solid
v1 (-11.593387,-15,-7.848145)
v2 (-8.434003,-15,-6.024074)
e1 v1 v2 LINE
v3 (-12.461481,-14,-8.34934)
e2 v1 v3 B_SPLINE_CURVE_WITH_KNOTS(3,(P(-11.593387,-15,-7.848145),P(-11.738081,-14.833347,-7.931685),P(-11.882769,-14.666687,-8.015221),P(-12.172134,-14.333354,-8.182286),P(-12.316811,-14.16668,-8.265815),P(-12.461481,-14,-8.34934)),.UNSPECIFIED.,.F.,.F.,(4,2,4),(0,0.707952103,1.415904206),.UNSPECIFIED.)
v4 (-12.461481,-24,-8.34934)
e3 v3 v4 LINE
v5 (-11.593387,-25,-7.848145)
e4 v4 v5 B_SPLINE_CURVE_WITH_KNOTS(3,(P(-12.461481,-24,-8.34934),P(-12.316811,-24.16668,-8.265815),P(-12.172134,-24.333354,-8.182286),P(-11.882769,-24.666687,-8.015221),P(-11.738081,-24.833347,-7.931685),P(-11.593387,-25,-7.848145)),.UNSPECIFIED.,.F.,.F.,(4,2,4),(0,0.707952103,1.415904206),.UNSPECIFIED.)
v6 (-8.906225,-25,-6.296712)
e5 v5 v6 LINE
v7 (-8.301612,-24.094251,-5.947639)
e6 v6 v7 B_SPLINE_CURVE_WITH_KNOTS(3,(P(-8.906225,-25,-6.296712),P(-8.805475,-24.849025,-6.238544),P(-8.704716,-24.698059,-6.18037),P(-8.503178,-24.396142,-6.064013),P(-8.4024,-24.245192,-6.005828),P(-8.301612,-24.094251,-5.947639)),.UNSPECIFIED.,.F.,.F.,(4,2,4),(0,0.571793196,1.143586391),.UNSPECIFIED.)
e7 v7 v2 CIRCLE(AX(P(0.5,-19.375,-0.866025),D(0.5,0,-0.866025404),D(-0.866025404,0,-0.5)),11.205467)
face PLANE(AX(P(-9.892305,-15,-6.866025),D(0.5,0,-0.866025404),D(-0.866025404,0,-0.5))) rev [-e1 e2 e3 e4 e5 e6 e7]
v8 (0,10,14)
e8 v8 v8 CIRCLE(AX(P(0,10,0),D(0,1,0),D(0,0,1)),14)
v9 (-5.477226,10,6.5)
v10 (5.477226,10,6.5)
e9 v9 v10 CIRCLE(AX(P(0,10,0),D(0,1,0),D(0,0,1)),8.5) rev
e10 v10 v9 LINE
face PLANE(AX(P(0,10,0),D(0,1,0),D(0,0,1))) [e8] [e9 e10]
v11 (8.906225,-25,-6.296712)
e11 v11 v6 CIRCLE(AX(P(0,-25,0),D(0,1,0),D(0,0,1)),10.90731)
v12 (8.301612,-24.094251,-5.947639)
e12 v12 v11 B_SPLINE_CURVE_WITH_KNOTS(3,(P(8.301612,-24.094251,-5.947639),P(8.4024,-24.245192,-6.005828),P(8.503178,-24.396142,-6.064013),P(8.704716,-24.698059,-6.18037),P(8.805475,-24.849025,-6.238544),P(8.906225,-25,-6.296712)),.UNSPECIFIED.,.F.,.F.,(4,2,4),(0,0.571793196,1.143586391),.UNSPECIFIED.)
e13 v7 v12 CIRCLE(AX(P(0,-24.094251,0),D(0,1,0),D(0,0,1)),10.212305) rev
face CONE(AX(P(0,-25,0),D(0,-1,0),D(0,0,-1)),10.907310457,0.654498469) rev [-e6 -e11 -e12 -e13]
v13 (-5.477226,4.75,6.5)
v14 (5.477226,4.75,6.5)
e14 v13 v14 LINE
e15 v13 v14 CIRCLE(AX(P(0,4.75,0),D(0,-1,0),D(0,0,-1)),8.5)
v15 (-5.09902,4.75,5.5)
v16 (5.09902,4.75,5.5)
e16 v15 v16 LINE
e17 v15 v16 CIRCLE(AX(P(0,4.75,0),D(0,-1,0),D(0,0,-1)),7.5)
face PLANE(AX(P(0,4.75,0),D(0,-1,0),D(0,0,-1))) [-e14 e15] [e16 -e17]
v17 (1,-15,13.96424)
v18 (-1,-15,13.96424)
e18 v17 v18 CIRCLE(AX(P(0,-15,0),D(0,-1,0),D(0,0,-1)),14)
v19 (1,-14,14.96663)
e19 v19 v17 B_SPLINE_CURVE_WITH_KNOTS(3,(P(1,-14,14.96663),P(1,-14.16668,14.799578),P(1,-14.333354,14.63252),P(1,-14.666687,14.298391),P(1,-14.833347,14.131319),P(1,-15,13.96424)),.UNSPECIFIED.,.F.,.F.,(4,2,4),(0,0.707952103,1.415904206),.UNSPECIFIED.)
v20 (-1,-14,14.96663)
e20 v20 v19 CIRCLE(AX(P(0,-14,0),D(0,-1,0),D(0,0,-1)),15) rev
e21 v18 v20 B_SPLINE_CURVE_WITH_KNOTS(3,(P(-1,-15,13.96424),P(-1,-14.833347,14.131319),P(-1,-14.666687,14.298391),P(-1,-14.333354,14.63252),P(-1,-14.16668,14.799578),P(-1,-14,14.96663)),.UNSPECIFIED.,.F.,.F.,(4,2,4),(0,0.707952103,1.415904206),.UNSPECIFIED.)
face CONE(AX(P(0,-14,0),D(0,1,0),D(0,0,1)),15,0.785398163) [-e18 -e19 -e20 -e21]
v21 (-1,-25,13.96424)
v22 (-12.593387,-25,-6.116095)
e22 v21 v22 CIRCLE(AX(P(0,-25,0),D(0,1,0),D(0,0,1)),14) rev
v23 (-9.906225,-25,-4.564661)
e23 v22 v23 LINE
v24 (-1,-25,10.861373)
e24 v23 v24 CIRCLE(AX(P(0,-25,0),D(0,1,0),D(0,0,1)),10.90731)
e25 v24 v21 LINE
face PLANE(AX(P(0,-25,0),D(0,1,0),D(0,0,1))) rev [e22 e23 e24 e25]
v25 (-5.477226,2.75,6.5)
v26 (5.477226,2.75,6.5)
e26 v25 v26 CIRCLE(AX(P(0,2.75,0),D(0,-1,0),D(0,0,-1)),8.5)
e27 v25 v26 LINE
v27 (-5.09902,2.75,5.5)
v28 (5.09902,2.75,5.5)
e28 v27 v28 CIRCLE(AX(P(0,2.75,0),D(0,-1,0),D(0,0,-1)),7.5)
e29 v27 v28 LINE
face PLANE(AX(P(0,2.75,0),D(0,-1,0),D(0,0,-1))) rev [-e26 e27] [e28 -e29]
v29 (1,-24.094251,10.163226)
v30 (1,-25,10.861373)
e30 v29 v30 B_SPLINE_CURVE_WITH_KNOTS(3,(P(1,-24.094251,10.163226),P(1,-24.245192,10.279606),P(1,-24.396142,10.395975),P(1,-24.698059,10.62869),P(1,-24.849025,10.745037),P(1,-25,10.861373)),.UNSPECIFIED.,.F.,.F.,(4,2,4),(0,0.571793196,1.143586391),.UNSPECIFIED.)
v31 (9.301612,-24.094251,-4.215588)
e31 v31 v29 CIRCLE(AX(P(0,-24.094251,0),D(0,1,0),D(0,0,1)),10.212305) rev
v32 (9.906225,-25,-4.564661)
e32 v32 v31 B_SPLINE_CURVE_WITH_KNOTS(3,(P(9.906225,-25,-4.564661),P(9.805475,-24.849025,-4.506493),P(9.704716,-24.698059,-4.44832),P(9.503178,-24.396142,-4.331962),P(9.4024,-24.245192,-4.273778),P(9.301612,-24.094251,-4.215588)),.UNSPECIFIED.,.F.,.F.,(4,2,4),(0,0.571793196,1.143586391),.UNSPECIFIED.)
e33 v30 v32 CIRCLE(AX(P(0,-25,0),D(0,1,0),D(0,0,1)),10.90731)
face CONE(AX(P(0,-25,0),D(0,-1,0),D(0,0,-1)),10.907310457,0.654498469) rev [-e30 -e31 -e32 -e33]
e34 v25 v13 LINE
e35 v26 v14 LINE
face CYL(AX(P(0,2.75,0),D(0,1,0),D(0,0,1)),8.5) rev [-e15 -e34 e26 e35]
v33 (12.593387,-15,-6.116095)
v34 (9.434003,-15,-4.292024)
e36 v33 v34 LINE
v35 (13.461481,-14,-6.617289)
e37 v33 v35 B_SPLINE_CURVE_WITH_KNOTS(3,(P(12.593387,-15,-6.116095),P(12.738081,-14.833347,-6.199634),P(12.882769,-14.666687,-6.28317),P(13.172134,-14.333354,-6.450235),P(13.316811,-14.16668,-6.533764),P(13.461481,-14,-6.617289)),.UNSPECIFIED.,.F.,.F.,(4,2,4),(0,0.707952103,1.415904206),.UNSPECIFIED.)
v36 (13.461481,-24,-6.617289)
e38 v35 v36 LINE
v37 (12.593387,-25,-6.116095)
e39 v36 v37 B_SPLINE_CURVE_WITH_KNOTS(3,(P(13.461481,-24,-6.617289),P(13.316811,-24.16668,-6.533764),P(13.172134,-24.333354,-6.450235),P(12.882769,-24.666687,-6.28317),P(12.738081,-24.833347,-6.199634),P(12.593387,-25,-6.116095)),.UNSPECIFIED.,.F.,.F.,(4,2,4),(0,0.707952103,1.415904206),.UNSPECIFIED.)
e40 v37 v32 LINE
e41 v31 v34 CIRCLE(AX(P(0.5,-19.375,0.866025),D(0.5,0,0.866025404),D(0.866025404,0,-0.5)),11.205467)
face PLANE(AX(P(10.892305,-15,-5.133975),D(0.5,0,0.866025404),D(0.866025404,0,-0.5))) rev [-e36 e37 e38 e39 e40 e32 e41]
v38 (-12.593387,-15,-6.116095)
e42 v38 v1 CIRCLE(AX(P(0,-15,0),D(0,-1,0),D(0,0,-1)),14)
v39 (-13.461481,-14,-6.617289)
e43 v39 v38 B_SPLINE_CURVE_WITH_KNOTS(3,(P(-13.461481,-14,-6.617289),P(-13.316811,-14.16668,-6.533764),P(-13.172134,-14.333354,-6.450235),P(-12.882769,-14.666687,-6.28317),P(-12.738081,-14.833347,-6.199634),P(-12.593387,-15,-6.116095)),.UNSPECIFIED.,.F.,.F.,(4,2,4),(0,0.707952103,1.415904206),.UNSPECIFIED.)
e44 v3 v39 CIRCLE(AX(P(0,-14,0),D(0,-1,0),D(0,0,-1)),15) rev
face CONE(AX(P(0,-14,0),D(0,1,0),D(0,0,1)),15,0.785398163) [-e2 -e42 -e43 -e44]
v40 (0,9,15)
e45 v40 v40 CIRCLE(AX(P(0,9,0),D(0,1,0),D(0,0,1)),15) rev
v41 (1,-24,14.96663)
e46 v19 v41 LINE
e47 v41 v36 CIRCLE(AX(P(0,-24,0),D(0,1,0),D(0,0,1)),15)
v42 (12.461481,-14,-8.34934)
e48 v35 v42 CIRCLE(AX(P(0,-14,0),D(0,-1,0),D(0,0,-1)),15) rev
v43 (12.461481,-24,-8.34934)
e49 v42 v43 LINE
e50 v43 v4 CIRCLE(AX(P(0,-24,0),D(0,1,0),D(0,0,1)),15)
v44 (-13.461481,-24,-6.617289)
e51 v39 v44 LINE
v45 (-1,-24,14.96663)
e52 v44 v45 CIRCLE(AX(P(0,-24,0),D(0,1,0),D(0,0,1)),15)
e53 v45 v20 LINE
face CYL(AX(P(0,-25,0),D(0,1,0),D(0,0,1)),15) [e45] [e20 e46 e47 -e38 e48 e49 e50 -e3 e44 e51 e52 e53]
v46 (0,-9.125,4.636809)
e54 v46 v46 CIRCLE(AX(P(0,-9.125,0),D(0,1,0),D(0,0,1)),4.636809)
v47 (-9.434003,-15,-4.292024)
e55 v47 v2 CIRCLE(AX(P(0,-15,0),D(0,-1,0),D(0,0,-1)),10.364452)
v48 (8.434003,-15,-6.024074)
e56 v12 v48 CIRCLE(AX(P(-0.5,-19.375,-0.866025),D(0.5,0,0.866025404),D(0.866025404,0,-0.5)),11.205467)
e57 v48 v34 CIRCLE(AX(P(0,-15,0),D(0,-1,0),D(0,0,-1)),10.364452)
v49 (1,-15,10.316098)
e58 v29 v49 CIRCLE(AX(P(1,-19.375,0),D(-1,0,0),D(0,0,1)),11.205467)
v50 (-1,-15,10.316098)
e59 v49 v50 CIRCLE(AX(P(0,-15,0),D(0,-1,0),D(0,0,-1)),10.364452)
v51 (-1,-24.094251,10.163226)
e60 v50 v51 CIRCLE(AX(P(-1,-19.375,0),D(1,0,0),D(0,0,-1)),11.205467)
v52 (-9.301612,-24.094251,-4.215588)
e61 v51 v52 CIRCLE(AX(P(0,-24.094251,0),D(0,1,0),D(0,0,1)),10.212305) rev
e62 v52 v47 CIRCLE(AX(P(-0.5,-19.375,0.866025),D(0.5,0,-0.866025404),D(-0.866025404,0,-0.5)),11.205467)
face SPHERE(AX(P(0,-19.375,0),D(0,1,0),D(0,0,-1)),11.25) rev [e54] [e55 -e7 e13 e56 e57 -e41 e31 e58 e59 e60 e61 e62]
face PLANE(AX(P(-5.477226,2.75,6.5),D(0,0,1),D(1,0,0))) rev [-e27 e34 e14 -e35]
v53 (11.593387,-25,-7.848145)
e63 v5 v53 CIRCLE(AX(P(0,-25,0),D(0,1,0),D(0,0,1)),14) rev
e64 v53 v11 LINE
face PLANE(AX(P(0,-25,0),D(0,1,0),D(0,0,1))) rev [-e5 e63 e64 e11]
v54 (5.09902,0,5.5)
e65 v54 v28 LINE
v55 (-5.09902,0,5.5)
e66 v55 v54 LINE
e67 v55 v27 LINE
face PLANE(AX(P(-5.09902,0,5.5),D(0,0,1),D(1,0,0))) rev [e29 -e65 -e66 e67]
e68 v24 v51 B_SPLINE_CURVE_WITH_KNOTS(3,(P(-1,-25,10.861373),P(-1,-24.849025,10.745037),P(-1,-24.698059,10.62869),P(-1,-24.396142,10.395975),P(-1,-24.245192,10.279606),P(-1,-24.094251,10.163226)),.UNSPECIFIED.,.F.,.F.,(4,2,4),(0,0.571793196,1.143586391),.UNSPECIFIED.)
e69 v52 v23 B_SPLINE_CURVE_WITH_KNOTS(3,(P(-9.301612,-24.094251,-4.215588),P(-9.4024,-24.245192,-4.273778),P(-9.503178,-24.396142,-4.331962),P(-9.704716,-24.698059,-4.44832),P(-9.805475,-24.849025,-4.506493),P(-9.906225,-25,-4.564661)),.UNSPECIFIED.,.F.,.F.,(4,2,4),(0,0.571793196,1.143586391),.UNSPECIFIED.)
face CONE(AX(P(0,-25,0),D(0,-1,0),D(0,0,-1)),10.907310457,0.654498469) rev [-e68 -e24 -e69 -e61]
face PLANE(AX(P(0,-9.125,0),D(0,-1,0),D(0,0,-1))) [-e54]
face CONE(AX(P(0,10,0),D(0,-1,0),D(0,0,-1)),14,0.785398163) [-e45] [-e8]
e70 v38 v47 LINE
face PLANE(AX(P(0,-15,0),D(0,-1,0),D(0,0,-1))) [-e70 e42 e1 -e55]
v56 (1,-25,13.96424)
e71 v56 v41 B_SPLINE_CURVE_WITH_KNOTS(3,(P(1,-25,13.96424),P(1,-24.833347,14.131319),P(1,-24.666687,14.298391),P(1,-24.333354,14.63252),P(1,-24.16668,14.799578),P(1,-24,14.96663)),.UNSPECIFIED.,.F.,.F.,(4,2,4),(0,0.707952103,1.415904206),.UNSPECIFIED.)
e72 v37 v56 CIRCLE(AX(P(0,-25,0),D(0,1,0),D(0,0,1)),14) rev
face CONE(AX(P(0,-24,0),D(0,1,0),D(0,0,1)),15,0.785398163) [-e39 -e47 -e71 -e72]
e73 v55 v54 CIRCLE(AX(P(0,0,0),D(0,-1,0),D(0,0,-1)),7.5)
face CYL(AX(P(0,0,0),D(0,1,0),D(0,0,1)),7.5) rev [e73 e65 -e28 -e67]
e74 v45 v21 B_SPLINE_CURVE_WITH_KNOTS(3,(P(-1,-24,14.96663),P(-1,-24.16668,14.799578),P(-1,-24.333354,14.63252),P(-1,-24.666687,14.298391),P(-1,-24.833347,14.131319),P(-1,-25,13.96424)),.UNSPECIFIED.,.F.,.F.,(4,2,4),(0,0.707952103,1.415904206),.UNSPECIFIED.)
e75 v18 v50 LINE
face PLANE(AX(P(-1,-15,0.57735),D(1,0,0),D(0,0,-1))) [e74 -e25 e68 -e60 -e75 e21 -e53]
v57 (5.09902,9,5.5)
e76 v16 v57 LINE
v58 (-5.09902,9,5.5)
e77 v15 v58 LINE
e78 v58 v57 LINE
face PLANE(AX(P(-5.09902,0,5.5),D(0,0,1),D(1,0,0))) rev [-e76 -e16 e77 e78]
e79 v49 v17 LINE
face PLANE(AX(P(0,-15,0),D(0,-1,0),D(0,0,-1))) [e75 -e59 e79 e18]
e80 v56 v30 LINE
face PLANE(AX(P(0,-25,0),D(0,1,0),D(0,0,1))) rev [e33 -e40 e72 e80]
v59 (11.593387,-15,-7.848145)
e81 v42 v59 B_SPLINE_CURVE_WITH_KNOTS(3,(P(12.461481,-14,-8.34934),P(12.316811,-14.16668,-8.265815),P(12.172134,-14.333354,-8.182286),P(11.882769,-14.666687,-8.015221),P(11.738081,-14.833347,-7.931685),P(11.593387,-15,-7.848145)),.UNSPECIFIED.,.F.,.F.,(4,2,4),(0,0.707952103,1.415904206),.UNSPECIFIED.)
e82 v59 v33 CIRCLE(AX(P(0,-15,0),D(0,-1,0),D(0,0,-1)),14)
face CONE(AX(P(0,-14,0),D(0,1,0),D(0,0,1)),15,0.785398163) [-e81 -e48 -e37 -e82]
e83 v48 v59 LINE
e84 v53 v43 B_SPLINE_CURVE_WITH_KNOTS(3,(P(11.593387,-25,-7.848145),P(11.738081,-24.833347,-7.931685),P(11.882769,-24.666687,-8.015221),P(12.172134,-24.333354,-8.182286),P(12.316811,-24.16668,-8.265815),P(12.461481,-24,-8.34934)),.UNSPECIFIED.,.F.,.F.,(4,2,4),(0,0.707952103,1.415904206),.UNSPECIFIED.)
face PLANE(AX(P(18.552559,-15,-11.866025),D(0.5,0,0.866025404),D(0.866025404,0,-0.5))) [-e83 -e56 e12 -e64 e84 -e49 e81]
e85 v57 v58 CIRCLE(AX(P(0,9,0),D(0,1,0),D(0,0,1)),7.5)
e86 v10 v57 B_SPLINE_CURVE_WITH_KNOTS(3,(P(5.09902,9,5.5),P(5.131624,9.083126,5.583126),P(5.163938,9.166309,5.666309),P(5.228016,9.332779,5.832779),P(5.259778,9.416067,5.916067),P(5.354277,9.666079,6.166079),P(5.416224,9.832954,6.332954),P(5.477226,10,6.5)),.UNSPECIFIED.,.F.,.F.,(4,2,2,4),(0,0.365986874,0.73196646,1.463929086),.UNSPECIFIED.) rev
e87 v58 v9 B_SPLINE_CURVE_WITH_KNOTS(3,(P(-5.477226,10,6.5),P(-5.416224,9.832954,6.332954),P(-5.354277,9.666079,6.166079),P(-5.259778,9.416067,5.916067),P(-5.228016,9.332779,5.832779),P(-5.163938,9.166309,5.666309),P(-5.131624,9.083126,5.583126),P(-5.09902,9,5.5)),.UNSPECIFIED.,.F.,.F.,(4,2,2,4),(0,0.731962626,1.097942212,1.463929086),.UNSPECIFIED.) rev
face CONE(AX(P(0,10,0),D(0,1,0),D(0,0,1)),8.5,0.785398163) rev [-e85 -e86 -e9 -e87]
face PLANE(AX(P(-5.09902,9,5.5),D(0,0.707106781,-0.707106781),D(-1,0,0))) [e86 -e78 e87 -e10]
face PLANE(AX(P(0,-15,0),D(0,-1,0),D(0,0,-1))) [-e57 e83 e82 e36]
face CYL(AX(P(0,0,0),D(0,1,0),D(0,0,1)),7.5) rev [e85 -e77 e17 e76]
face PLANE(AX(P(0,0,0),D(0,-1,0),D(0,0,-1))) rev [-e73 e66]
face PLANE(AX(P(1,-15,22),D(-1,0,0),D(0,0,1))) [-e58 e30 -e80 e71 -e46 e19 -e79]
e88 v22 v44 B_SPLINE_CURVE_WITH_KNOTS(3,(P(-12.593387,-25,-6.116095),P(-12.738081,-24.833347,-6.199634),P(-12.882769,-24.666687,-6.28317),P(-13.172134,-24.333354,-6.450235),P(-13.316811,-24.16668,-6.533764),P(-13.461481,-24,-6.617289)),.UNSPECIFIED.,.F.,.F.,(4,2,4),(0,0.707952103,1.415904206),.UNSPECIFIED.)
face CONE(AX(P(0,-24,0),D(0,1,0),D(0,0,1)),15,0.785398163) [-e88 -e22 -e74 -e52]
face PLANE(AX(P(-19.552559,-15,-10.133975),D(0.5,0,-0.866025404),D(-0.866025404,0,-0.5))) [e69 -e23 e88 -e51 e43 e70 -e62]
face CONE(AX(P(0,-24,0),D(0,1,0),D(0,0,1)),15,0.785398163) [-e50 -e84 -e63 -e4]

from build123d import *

# Parameters (mm, degrees)
SKETCH1_R           = 15
BOSS_EXTRUDE2_DEPTH = 25
CUT_EXTRUDE1_DEPTH  = 10
SKETCH4_R           = 15
CUT_EXTRUDE2_DEPTH  = 15
CHAMFER1_SIZE       = 1
CHAMFER3_SIZE       = 1
CUT_EXTRUDE4_DEPTH  = 10
CUT_EXTRUDE5_DEPTH  = 1
CHAMFER5_SIZE       = 1


with BuildPart() as part:
    # Sketch1 → Boss-Extrude2 (new, symmetric)
    with BuildSketch(Plane(origin=(0, 0, 0), x_dir=(1, 0, 0), z_dir=(0, 1, 0))):
        with Locations(Location((0, 0, 0), (0, 0, 270))):
            Circle(SKETCH1_R)
    extrude(amount=BOSS_EXTRUDE2_DEPTH, both=True)

    # Sketch2 → Cut-Revolve1 (revolve, cut)
    with BuildSketch(Plane(origin=(0, 0, 0), x_dir=(0, 0, -1), z_dir=(1, 0, 0))):
        with BuildLine():
            Line((0, -9.125), (0, -25))
            Line((0, -25), (9.742785793, -25))
            ThreePointArc((9.742785793, -25), (10.709672947, -15.930380229), (4.636809248, -9.125))
            Line((4.636809248, -9.125), (0, -9.125))
        make_face()
    revolve(axis=Axis((0, -9.125, 0), (0, -1, 0)), mode=Mode.SUBTRACT)

    # Sketch3 → Cut-Extrude1 (cut)
    with BuildSketch(Plane(origin=(0, -25, 0), x_dir=(-1, 0, 0), z_dir=(0, -1, 0))):
        Polygon((19.052558883, 11), (18.552558883, 11.866025404), (9.892304845, 6.866025404), (0, 1.154700538), (-9.892304845, 6.866025404), (-18.552558883, 11.866025404), (-19.052558883, 11), (-19.552558883, 10.133974596), (-10.892304845, 5.133974596), (-1, -0.577350269), (-1, -12), (-1, -22), (0, -22), (1, -22), (1, -12), (1, -0.577350269), (10.892304845, 5.133974596), (19.552558883, 10.133974596), align=None)
    extrude(amount=-CUT_EXTRUDE1_DEPTH, mode=Mode.SUBTRACT)

    # Sketch4 → Cut-Extrude2 (cut)
    with BuildSketch(Plane(origin=(0, 25, 0), x_dir=(1, 0, 0), z_dir=(0, 1, 0))):
        with Locations(Location((0, 0, 0), (0, 0, 270))):
            Circle(SKETCH4_R)
    extrude(amount=-CUT_EXTRUDE2_DEPTH, mode=Mode.SUBTRACT)

    # Chamfer1
    chamfer1_edges = [part.edges().sort_by_distance(p)[0] for p in [
        (0, -25, -15),
        (-12.990381057, -25, 7.5),
        (12.990381057, -25, 7.5),
    ]]
    chamfer(chamfer1_edges, length=CHAMFER1_SIZE)

    # Chamfer3
    chamfer3_edges = [part.edges().sort_by_distance(p)[0] for p in [
        (12.990381057, -15, -7.5),
        (0.500278319, -15, 14.991655066),
        (-12.990381057, -15, -7.5),
    ]]
    chamfer(chamfer3_edges, length=CHAMFER3_SIZE)

    # Chamfer4: read off the stored shape, not the designer's step
    # Chamfer4 outline → Chamfer4 (revolve, cut)
    with BuildSketch(Plane.XY):
        Polygon((10.907310457, -25), (10.212304822, -24.094251023), (0, -24.094251023), (0, -25), align=None)
    revolve(axis=Axis((0, 0, 0), (0, 1, 0)), mode=Mode.SUBTRACT)

    # Sketch5 → Cut-Extrude4 (cut)
    with BuildSketch(Plane(origin=(0, 10, 0), x_dir=(1, 0, 0), z_dir=(0, 1, 0))):
        with BuildLine():
            Line((-5.099019514, -5.5), (5.099019514, -5.5))
            ThreePointArc((5.099019514, -5.5), (0, 7.5), (-5.099019514, -5.5))
        make_face()
    extrude(amount=-CUT_EXTRUDE4_DEPTH, mode=Mode.SUBTRACT)

    # Sketch7 → Cut-Extrude5 (cut, symmetric)
    with BuildSketch(Plane(origin=(0, 3.75, 0), x_dir=(1, 0, 0), z_dir=(0, 1, 0))):
        with BuildLine():
            Line((-5.477225575, -6.5), (5.477225575, -6.5))
            ThreePointArc((5.477225575, -6.5), (0, 8.5), (-5.477225575, -6.5))
        make_face()
    extrude(amount=CUT_EXTRUDE5_DEPTH, both=True, mode=Mode.SUBTRACT)

    # Chamfer5
    chamfer5_edges = [part.edges().sort_by_distance(p)[0] for p in [
        (0, 10, -7.5),
        (0, 10, 5.5),
        (0, 10, -15),
    ]]
    chamfer(chamfer5_edges, length=CHAMFER5_SIZE)


solid = part.part
